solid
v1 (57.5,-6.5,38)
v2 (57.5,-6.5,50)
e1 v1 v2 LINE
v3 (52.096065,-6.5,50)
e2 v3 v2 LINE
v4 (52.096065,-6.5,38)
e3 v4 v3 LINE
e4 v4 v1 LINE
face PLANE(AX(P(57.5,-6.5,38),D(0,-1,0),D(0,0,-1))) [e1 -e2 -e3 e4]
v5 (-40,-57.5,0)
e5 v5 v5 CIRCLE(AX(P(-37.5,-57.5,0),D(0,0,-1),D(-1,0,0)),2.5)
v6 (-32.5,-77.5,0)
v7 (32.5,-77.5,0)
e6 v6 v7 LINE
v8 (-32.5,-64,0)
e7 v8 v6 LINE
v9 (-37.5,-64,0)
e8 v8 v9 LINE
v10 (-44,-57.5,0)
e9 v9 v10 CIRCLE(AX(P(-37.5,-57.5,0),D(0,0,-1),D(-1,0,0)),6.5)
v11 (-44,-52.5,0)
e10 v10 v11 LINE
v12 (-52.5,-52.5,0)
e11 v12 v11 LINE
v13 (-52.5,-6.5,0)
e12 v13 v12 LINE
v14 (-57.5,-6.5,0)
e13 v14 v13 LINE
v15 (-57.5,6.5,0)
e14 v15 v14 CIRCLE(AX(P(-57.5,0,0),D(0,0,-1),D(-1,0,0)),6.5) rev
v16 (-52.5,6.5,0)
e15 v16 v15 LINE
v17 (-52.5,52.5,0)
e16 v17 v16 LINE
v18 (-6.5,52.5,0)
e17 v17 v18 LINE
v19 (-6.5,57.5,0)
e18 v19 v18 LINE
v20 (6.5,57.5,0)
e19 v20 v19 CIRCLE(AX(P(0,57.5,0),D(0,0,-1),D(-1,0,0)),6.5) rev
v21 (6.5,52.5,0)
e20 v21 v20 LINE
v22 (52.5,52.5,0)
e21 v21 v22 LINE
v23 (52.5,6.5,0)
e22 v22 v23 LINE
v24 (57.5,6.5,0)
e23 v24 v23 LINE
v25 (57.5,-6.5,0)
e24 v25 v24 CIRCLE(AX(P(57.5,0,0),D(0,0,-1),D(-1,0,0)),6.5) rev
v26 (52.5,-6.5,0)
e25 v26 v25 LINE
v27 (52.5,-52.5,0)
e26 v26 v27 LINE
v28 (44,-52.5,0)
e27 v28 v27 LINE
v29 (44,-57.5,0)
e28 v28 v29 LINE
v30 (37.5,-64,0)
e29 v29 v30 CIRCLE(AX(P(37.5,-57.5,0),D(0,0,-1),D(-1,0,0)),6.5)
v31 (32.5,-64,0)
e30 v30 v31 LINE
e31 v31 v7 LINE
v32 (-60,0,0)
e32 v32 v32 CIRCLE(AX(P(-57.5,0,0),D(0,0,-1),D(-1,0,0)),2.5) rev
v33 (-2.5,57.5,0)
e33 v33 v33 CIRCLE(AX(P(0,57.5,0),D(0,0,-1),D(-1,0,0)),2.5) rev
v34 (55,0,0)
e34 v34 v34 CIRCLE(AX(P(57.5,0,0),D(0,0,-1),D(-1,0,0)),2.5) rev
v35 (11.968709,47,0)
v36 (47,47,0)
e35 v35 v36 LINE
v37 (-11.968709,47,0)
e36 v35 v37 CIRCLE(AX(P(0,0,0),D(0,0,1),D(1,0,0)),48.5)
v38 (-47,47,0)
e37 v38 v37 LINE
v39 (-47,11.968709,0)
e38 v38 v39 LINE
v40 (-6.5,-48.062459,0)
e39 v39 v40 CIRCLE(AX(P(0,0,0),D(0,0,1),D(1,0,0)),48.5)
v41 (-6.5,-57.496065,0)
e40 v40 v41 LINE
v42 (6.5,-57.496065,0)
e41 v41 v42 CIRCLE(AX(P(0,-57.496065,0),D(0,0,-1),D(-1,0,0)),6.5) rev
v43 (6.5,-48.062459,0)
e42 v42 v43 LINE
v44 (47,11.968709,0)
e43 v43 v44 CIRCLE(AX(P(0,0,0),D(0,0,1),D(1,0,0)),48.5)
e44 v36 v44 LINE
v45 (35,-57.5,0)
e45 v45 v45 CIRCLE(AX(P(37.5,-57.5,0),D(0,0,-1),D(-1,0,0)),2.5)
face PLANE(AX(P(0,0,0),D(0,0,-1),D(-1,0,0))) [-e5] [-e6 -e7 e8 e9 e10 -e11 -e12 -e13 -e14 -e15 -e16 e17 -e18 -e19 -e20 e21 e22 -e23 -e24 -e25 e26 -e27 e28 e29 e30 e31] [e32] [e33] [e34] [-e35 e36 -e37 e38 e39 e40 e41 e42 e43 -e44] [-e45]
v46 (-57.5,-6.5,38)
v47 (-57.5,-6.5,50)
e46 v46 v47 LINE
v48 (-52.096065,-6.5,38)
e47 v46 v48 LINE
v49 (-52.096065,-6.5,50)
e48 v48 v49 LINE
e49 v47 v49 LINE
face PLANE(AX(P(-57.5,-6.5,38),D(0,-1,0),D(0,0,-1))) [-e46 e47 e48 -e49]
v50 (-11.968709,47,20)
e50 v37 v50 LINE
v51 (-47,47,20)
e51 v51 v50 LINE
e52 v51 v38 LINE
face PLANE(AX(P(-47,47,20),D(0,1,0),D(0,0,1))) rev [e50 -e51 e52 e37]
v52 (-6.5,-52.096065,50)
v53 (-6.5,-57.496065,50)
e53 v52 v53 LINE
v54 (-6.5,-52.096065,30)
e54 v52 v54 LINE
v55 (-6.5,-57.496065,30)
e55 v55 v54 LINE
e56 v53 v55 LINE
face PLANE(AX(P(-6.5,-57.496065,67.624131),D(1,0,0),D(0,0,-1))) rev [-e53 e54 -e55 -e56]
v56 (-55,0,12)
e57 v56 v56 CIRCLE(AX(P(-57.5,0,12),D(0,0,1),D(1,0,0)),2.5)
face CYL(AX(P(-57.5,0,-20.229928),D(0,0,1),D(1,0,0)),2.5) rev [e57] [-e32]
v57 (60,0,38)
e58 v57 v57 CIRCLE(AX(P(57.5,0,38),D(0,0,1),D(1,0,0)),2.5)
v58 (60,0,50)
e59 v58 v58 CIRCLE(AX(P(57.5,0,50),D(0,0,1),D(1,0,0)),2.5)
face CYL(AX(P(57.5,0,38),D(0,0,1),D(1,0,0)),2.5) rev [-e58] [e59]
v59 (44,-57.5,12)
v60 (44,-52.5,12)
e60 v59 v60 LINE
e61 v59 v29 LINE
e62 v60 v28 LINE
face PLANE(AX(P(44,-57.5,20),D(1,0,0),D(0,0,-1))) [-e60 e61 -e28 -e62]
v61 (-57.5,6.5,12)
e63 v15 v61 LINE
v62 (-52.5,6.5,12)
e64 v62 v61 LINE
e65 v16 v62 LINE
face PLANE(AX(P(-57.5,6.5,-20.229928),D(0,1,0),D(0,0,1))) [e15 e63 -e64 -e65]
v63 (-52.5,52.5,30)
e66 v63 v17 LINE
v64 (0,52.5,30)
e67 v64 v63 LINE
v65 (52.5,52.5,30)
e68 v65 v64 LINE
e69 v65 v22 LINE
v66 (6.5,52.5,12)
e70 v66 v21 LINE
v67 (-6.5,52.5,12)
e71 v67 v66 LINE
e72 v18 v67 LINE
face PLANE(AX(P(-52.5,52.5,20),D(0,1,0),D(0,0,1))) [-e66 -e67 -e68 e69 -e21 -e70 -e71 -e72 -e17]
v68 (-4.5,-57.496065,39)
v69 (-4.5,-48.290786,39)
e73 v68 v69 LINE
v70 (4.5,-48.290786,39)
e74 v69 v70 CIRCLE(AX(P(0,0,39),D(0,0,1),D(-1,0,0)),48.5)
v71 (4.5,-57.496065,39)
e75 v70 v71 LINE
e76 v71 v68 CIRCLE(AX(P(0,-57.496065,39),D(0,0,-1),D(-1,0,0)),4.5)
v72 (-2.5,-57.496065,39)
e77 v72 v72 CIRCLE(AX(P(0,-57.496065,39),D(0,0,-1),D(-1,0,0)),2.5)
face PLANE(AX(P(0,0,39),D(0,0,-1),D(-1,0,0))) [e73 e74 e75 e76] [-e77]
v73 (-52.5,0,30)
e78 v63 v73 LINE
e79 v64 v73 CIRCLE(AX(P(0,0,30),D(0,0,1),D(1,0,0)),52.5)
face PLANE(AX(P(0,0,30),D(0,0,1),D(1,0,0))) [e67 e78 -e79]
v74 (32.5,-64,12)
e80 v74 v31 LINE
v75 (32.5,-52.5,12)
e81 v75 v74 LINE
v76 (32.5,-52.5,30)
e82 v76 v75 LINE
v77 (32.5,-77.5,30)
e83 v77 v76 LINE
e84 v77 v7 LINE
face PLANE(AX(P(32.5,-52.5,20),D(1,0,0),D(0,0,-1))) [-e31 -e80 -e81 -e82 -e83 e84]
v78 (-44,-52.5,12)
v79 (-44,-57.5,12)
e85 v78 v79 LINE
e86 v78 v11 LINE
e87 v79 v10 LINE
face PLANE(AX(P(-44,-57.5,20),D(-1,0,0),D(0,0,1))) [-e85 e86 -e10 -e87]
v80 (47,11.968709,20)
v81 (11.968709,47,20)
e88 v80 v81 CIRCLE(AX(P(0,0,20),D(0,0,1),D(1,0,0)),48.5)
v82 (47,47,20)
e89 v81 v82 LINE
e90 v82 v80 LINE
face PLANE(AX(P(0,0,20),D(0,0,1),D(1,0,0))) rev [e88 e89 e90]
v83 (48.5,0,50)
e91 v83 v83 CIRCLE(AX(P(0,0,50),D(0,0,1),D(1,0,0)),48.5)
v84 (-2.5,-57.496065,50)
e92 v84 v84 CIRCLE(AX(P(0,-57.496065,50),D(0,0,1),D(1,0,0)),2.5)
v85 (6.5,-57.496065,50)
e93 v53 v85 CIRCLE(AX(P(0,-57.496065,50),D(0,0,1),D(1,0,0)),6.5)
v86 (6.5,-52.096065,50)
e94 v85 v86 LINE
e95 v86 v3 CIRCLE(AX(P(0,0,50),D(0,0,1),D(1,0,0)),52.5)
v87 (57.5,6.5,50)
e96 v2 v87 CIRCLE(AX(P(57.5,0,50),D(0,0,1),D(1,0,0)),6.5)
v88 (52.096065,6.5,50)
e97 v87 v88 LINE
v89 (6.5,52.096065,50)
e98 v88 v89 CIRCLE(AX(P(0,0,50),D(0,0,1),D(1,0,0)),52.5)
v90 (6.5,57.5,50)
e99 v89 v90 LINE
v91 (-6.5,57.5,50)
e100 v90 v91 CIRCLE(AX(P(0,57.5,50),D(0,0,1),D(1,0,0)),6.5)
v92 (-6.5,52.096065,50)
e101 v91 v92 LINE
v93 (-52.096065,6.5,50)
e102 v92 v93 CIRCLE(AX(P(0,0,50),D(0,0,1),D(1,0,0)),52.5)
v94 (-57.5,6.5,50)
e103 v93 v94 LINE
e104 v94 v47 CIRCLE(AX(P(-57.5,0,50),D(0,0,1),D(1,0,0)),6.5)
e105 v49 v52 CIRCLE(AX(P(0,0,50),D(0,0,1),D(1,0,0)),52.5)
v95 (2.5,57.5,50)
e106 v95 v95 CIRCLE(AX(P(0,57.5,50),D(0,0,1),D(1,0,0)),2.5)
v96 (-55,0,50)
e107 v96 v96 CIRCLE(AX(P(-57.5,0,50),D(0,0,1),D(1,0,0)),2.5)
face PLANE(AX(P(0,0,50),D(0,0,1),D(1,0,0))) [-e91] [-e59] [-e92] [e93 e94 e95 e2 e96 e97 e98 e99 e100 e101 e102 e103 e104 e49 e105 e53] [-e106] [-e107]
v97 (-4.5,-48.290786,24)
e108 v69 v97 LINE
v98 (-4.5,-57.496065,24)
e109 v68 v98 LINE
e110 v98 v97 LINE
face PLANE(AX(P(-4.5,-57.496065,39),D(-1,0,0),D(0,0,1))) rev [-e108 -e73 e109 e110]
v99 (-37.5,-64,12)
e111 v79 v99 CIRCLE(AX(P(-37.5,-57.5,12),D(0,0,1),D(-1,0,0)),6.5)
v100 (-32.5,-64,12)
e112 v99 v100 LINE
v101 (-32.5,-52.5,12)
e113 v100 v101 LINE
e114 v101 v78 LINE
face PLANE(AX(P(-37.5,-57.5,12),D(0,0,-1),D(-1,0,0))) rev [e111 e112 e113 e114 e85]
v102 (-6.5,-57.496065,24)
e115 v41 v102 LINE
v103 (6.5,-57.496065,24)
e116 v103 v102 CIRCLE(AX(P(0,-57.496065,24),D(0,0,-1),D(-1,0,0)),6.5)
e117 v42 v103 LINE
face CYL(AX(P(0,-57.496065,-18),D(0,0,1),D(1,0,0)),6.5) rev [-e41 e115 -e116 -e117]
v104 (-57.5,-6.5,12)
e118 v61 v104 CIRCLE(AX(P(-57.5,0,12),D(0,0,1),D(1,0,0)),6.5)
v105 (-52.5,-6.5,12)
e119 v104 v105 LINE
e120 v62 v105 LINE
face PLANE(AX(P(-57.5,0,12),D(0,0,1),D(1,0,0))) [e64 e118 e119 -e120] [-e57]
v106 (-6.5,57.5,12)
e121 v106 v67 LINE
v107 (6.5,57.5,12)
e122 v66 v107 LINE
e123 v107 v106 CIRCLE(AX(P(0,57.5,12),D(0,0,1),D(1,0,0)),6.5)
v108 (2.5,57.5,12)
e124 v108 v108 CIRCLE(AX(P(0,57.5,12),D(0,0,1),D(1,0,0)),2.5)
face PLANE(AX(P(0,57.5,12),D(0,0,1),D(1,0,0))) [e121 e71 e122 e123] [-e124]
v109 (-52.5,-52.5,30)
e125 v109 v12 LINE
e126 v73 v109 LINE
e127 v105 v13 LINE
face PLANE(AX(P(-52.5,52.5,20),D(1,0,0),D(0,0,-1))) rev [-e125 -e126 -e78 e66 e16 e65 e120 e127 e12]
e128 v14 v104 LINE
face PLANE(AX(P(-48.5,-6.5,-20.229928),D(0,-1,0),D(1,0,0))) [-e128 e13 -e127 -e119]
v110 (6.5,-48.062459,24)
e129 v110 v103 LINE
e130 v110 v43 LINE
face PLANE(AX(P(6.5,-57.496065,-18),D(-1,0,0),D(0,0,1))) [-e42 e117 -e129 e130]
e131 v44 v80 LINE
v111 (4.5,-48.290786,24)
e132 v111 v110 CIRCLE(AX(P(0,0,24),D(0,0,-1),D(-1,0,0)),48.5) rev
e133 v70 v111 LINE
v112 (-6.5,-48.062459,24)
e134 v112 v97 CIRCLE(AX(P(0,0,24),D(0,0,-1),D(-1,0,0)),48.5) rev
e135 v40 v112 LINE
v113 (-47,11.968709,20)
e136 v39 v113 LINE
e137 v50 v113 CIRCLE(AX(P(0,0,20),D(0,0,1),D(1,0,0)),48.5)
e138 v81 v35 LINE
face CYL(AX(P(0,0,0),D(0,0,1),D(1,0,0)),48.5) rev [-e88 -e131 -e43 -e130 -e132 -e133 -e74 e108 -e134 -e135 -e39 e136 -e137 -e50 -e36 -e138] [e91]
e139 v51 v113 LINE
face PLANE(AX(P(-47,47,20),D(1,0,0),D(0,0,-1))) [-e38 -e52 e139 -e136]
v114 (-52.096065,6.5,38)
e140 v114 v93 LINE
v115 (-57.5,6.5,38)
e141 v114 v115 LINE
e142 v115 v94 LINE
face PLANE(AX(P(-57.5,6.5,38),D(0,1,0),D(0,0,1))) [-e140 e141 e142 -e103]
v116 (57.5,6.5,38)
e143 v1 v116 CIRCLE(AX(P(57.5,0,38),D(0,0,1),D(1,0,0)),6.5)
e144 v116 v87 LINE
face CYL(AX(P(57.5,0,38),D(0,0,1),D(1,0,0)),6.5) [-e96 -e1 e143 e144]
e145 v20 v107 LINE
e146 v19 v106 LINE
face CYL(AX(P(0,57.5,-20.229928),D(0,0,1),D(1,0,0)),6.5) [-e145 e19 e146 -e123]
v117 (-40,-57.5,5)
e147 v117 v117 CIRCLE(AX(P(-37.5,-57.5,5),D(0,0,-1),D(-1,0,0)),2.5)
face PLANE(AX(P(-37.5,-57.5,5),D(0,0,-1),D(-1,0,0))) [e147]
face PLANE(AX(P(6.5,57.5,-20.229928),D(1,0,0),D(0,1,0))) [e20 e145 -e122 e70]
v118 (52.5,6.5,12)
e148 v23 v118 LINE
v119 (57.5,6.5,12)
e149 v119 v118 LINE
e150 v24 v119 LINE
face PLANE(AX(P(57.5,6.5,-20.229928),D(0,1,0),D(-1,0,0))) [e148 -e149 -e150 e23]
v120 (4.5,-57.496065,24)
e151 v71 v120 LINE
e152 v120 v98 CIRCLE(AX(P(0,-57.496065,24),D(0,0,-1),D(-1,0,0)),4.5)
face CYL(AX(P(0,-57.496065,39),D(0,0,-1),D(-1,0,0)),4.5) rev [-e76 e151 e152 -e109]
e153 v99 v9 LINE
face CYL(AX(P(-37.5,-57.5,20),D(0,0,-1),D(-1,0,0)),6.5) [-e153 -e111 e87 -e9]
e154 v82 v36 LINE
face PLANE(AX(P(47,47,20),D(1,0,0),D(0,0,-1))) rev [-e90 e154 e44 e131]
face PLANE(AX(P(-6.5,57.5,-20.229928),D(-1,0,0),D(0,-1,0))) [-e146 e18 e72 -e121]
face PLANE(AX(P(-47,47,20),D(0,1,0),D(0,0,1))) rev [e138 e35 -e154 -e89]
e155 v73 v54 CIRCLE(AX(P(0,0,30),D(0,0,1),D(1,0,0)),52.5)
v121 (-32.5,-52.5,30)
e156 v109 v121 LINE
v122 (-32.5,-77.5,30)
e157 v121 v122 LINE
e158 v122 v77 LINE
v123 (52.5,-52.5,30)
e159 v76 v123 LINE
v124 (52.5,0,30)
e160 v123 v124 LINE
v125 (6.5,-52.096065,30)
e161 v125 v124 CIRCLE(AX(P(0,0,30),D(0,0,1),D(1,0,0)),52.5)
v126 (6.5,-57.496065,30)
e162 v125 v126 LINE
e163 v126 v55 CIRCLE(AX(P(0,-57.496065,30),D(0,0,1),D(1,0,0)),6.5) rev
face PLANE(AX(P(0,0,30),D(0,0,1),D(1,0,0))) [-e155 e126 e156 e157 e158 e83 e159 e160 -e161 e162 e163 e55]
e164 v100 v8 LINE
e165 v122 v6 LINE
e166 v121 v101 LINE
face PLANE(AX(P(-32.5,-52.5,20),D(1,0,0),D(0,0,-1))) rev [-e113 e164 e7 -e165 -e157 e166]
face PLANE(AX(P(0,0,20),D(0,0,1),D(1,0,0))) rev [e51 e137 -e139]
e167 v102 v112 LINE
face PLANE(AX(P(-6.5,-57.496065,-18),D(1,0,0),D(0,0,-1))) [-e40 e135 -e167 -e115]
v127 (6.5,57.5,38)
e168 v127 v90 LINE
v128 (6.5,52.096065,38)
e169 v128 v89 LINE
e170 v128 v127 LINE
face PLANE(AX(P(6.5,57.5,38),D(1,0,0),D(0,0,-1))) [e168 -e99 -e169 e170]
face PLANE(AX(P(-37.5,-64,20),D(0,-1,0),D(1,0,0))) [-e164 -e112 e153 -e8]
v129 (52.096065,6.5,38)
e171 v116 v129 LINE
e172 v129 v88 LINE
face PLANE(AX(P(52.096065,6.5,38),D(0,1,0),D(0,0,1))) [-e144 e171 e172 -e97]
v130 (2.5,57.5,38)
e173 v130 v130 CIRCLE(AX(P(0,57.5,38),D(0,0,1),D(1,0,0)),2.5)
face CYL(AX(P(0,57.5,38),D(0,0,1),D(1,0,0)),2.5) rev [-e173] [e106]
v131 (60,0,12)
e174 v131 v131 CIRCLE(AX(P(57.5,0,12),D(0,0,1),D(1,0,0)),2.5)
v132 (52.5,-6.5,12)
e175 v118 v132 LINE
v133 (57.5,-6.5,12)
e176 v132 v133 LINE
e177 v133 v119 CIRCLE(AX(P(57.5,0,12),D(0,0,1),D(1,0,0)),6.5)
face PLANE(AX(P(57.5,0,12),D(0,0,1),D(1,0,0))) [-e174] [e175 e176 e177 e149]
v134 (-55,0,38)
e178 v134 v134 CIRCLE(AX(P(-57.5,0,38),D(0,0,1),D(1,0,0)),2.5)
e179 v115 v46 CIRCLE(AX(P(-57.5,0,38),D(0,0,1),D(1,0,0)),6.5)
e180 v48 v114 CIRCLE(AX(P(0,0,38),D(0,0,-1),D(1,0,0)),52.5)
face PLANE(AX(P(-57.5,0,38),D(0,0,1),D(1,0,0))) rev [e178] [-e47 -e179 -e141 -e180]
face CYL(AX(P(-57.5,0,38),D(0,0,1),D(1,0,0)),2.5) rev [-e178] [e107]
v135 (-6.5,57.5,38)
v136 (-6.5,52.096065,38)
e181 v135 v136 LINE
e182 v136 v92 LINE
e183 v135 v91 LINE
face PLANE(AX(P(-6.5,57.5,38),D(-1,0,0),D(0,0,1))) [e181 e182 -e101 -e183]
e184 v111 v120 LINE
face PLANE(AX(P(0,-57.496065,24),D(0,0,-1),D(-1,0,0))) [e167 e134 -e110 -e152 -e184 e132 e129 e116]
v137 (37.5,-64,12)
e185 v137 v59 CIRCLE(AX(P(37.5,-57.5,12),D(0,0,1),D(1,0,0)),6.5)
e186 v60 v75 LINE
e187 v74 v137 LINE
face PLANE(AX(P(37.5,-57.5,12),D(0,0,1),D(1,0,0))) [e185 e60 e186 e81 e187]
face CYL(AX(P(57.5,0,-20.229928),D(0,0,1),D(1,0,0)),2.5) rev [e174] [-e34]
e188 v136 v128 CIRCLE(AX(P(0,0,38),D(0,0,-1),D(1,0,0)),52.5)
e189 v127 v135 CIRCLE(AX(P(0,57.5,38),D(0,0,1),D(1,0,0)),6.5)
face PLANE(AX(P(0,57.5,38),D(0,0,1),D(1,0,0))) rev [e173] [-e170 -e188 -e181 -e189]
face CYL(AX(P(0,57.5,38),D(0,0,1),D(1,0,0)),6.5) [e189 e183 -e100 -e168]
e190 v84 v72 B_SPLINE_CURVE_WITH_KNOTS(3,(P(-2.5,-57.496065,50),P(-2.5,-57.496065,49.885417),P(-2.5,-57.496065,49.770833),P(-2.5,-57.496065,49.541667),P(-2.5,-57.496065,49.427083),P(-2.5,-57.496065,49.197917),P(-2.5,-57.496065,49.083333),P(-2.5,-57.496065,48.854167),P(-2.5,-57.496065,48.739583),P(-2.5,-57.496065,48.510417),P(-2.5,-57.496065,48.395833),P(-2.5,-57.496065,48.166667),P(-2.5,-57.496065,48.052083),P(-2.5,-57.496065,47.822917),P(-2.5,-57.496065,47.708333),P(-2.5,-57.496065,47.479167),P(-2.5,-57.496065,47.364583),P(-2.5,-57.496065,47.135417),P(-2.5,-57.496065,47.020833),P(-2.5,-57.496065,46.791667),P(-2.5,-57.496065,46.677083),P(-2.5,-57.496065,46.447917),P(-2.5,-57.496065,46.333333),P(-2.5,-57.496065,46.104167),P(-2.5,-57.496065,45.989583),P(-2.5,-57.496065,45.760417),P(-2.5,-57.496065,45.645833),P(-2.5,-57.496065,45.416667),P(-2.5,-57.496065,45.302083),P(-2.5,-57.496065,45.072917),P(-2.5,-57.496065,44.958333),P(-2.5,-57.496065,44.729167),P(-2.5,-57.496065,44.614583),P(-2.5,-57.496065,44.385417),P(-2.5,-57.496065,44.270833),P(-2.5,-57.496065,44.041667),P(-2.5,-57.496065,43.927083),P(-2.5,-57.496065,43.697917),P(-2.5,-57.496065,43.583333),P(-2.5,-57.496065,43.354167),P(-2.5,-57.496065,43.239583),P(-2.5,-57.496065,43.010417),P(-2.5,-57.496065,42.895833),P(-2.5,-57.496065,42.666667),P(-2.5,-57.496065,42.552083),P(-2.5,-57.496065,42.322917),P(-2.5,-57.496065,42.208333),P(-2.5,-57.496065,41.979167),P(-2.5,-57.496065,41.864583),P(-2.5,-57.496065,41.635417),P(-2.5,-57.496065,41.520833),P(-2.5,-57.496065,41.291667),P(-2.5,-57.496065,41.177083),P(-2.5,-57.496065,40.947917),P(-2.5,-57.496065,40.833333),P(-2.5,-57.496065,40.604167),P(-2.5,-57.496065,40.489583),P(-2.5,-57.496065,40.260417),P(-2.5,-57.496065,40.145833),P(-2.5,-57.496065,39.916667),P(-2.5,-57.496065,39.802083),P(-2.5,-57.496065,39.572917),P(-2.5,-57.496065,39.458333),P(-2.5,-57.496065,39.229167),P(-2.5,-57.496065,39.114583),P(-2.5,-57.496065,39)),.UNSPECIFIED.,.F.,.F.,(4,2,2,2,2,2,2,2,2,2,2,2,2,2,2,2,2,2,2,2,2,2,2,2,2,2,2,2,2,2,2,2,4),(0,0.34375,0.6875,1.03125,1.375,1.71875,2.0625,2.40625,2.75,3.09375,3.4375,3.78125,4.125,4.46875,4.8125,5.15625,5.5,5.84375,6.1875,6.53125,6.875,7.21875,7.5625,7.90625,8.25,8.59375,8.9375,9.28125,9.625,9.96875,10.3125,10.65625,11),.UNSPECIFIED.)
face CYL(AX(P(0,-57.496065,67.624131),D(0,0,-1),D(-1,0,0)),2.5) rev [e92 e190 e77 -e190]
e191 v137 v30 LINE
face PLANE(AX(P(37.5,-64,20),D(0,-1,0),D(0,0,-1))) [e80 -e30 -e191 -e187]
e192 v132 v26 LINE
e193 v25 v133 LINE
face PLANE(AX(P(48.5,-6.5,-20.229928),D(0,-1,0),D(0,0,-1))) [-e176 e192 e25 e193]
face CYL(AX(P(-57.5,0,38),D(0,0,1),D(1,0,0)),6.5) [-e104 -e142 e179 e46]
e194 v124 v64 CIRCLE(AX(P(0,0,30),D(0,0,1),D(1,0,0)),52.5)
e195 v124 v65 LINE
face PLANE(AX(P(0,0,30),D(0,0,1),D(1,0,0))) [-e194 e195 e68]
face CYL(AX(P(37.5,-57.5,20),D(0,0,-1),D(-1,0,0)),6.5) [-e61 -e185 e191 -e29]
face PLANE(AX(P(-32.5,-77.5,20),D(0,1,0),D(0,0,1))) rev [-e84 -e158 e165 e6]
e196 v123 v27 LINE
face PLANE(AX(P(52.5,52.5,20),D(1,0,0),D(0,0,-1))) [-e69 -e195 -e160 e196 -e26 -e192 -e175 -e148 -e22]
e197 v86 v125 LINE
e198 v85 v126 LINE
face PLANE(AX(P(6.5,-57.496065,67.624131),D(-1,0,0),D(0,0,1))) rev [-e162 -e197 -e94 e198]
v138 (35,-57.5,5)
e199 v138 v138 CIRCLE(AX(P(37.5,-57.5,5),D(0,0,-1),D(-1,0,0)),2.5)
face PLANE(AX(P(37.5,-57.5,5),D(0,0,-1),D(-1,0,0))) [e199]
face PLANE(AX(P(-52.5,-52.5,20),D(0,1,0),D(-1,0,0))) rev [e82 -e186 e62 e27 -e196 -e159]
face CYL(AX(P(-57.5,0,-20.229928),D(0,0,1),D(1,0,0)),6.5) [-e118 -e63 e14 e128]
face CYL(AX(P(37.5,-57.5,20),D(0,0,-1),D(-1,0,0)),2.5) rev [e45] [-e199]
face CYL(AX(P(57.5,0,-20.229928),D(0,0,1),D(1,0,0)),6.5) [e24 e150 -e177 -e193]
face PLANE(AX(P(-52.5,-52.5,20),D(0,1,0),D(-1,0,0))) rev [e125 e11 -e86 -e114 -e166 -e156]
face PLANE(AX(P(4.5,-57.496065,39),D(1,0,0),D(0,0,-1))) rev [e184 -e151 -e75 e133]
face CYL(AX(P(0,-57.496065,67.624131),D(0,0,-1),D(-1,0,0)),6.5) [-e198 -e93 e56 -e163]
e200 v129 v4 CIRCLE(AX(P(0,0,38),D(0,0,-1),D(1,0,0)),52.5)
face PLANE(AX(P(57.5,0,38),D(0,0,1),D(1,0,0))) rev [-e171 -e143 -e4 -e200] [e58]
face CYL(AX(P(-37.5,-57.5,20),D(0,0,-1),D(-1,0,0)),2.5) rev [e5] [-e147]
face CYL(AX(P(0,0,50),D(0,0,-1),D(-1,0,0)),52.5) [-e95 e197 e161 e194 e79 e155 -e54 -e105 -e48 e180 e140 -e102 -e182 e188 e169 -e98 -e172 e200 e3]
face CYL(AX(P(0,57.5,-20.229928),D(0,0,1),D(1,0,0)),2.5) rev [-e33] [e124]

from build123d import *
from build123d.topology import SkipClean

# Parameters (mm, degrees)
SKETCH1_W                = 105
SKETCH1_H                = 105
SKETCH1_W_2              = 94
SKETCH1_H_2              = 94
SKETCH1_W_3              = 65
SKETCH1_H_3              = 25
BOSS_EXTRUDE1_DEPTH      = 20
SKETCH2_W                = 65
SKETCH2_H                = 25
SKETCH2_W_2              = 94
SKETCH2_H_2              = 94
BOSS_EXTRUDE2_DEPTH      = 10
SKETCH3_W                = 57
SKETCH3_H                = 26.5
CUT_EXTRUDE1_DEPTH       = 20
SKETCH5_R                = 52.5
BOSS_EXTRUDE4_DEPTH      = 20
SKETCH8_R                = 48.5
CUT_EXTRUDE3_DEPTH       = 107.124926384
BOSS_EXTRUDE5_START      = -38
SKETCH9_R                = 2.5
BOSS_EXTRUDE5_DEPTH      = 12
SKETCH4_R                = 2.5
BOSS_EXTRUDE6_DEPTH      = 20
SKETCH10_W               = 15.5
SKETCH10_H               = 26.597794237
CUT_EXTRUDE4_DEPTH       = 20
BOSS_EXTRUDE8_START      = -45
SKETCH11_R               = 2.5
BOSS_EXTRUDE8_DEPTH      = 15
BOSS_EXTRUDE7_DEPTH      = 20
SKETCH16_R               = 2.5
BOSS_EXTRUDE9_DEPTH      = 30
CUT_EXTRUDE5_START       = -8
CUT_EXTRUDE5_DEPTH       = 8
SKETCH18_R               = 2.5
BOSS_EXTRUDE10_DEPTH     = 12
CUT_EXTRUDE12_DEPTH      = 18
CUT_EXTRUDE12_DEPTH_BACK = 24
CUT_EXTRUDE13_DEPTH      = 15


# Read off the part's stored shape, not the designer's step: Boss-Extrude7
with BuildPart() as part:
    # Sketch1 → Boss-Extrude1 (new body)
    # profile 1 of 2: a face of its own
    with BuildSketch(Plane.XY):
        Rectangle(SKETCH1_W, SKETCH1_H)
        Rectangle(SKETCH1_W_2, SKETCH1_H_2, mode=Mode.SUBTRACT)
    # profile 2 of 2: a face of its own
    with BuildSketch(Plane.XY):
        with Locations((0, -65)):
            Rectangle(SKETCH1_W_3, SKETCH1_H_3)
    extrude(amount=BOSS_EXTRUDE1_DEPTH)

    # Sketch2 → Boss-Extrude2 (add)
    # profile 1 of 3: a face of its own
    with BuildSketch(Plane.XY.offset(20)):
        with Locations((0, -65)):
            Rectangle(SKETCH2_W, SKETCH2_H)
    # profile 2 of 3: a face of its own
    with BuildSketch(Plane.XY.offset(20)):
        Polygon((52.5, 52.5), (-52.5, 52.5), (-52.5, -52.5), (-32.5, -52.5), (32.5, -52.5), (52.5, -52.5), align=None)
        Rectangle(SKETCH2_W_2, SKETCH2_H_2, mode=Mode.SUBTRACT)
    # profile 3 of 3: a face of its own
    with BuildSketch(Plane.XY.offset(20)):
        Rectangle(SKETCH2_W_2, SKETCH2_H_2)
    extrude(amount=BOSS_EXTRUDE2_DEPTH)

    # Sketch3 → Cut-Extrude1 (cut)
    with BuildSketch(Plane(origin=(0, 0, 0), x_dir=(-1, 0, 0), z_dir=(0, 0, -1))):
        with Locations((0, -60.25)):
            Rectangle(SKETCH3_W, SKETCH3_H)
    extrude(amount=-CUT_EXTRUDE1_DEPTH, mode=Mode.SUBTRACT)

    # Sketch5 → Boss-Extrude4 (add)
    with BuildSketch(Plane.XY.offset(30)):
        Circle(SKETCH5_R)
    extrude(amount=BOSS_EXTRUDE4_DEPTH)

    # Sketch8 → Cut-Extrude3 (cut, through all)
    with BuildSketch(Plane.XY.offset(50)):
        Circle(SKETCH8_R)
    extrude(amount=-CUT_EXTRUDE3_DEPTH, mode=Mode.SUBTRACT)

    # Sketch9 → Boss-Extrude5 (add)
    # profile 1 of 3: a face of its own
    with BuildSketch(Plane.XY.offset(50).offset(BOSS_EXTRUDE5_START)):
        with BuildLine():
            Line((57.5, 6.5), (48.5, 6.5))
            Line((48.5, 6.5), (48.5, -6.5))
            Line((48.5, -6.5), (57.5, -6.5))
            ThreePointArc((57.5, -6.5), (64, 0), (57.5, 6.5))
        make_face()
        with Locations((57.5, 0)):
            Circle(SKETCH9_R, mode=Mode.SUBTRACT)
    # profile 2 of 3: a face of its own
    with BuildSketch(Plane.XY.offset(50).offset(BOSS_EXTRUDE5_START)):
        with BuildLine():
            Line((-57.5, 6.5), (-48.5, 6.5))
            Line((-48.5, 6.5), (-48.5, -6.5))
            Line((-48.5, -6.5), (-57.5, -6.5))
            ThreePointArc((-57.5, -6.5), (-64, 0), (-57.5, 6.5))
        make_face()
        with Locations((-57.5, 0)):
            Circle(SKETCH9_R, mode=Mode.SUBTRACT)
    # profile 3 of 3: a face of its own
    with BuildSketch(Plane.XY.offset(50).offset(BOSS_EXTRUDE5_START)):
        with BuildLine():
            Line((-6.5, 57.5), (-6.5, 48.5))
            Line((-6.5, 48.5), (6.5, 48.5))
            Line((6.5, 48.5), (6.5, 57.5))
            ThreePointArc((6.5, 57.5), (0, 64), (-6.5, 57.5))
        make_face()
        with Locations((0, 57.5)):
            Circle(SKETCH9_R, mode=Mode.SUBTRACT)
    extrude(amount=-BOSS_EXTRUDE5_DEPTH)

    # Sketch4 → Boss-Extrude6 (add)
    with BuildSketch(Plane(origin=(0, 0, 0), x_dir=(-1, 0, 0), z_dir=(0, 0, -1))):
        with BuildLine():
            Line((-32.5, -64), (-32.5, -77.5))
            Line((-32.5, -77.5), (32.5, -77.5))
            Line((32.5, -77.5), (32.5, -64))
            Line((32.5, -64), (37.5, -64))
            ThreePointArc((37.5, -64), (42.096194078, -62.096194078), (44, -57.5))
            Line((44, -57.5), (44, -52.5))
            Line((44, -52.5), (52.5, -52.5))
            Line((52.5, -52.5), (52.021296507, -7.073521736))
            ThreePointArc((52.021296507, -7.073521736), (49.206713639, -18.301621043), (44, -28.640006983))
            Line((44, -28.640006983), (44, -20.402205763))
            ThreePointArc((44, -20.402205763), (0, -48.5), (-44, -20.402205763))
            Line((-44, -20.402205763), (-44, -28.640006983))
            ThreePointArc((-44, -28.640006983), (-50.330159944, -14.937369246), (-52.5, 0))
            Line((-52.5, 0), (-52.5, -52.5))
            Line((-52.5, -52.5), (-44, -52.5))
            Line((-44, -52.5), (-44, -57.5))
            ThreePointArc((-44, -57.5), (-42.096194078, -62.096194078), (-37.5, -64))
            Line((-37.5, -64), (-32.5, -64))
        make_face()
        with Locations((-37.5, -57.5)):
            Circle(SKETCH4_R, mode=Mode.SUBTRACT)
        with Locations((37.5, -57.5)):
            Circle(SKETCH4_R, mode=Mode.SUBTRACT)
    extrude(amount=-BOSS_EXTRUDE6_DEPTH)

    # Sketch10 → Cut-Extrude4 (cut)
    with BuildSketch(Plane(origin=(0, 0, 0), x_dir=(-1, 0, 0), z_dir=(0, 0, -1))):
        with Locations((-36.25, -33.701102881)):
            Rectangle(SKETCH10_W, SKETCH10_H)
        with Locations((37.754368076, -33.701102881)):
            Rectangle(SKETCH10_W, SKETCH10_H)
    extrude(amount=-CUT_EXTRUDE4_DEPTH, mode=Mode.SUBTRACT)

    # Sketch11 → Boss-Extrude8 (add)
    with BuildSketch(Plane.XY.offset(50).offset(BOSS_EXTRUDE8_START)):
        with Locations(Location((-37.5, -57.5, 0), (0, 0, 180))):
            Circle(SKETCH11_R)
        with Locations(Location((37.5, -57.5, 0), (0, 0, 180))):
            Circle(SKETCH11_R)
    extrude(amount=BOSS_EXTRUDE8_DEPTH)

    # Boss-Extrude7 outline → Boss-Extrude7 (add)
    with SkipClean():  # the faces are left unmerged after this step: merging them gives an invalid solid
        with BuildSketch(Plane.XY):
            with BuildLine():
                ThreePointArc((-30.004368076, -38.104958947), (-40.659489217, -26.439665971), (-47, -11.968709204))
                Line((-47, -11.968709204), (-47, -23.393375131))
                ThreePointArc((-47, -23.393375131), (-46.273225972, -24.79997093), (-45.504368076, -26.18401203))
                Line((-45.504368076, -26.18401203), (-45.504368076, -47))
                Line((-45.504368076, -47), (-30.004368076, -47))
                Line((-30.004368076, -47), (-30.004368076, -38.104958947))
            make_face()
            with BuildLine():
                Line((47, -23.393375131), (47, -11.968709204))
                ThreePointArc((47, -11.968709204), (40.137662704, -27.225319699), (28.5, -39.242833741))
                Line((28.5, -39.242833741), (28.5, -47))
                Line((28.5, -47), (44, -47))
                Line((44, -47), (44, -28.640006983))
                ThreePointArc((44, -28.640006983), (45.575561285, -26.059896653), (47, -23.393375131))
            make_face()
        extrude(amount=BOSS_EXTRUDE7_DEPTH)

    # Sketch16 → Boss-Extrude9 (add)
    with SkipClean():  # the faces are left unmerged after this step: merging them gives an invalid solid
        with BuildSketch(Plane.XY.offset(20)):
            with BuildLine():
                Line((-6.5, -57.496065111), (-6.5, -52.096065111))
                ThreePointArc((-6.5, -52.096065111), (0, -52.5), (6.5, -52.096065111))
                Line((6.5, -52.096065111), (6.5, -57.496065111))
                ThreePointArc((6.5, -57.496065111), (0, -63.996065111), (-6.5, -57.496065111))
            make_face()
            with Locations(Location((0, -57.496065111, 0), (0, 0, 180))):
                Circle(SKETCH16_R, mode=Mode.SUBTRACT)
        extrude(amount=BOSS_EXTRUDE9_DEPTH)

    # Sketch17 → Cut-Extrude5 (cut)
    with SkipClean():  # the faces are left unmerged after this step: merging them gives an invalid solid
        with BuildSketch(Plane.XY.offset(20).offset(CUT_EXTRUDE5_START)):
            with BuildLine():
                Line((32.5, -64), (32.5, -52.5))
                Line((32.5, -52.5), (44, -52.5))
                Line((44, -52.5), (44, -57.5))
                ThreePointArc((44, -57.5), (42.096194078, -62.096194078), (37.5, -64))
                Line((37.5, -64), (32.5, -64))
            make_face()
            with BuildLine():
                Line((-44, -52.5), (-32.5, -52.5))
                Line((-32.5, -52.5), (-32.5, -64))
                Line((-32.5, -64), (-37.5, -64))
                ThreePointArc((-37.5, -64), (-42.096194078, -62.096194078), (-44, -57.5))
                Line((-44, -57.5), (-44, -52.5))
            make_face()
        extrude(amount=CUT_EXTRUDE5_DEPTH, mode=Mode.SUBTRACT)

    # Sketch18 → Boss-Extrude10 (add)
    # profile 1 of 3: a face of its own
    with SkipClean():  # the faces are left unmerged after this step: merging them gives an invalid solid
        with BuildSketch(Plane.XY.offset(50)):
            with BuildLine():
                Line((-57.5, 6.5), (-52.096065111, 6.5))
                ThreePointArc((-52.096065111, 6.5), (-52.5, 0), (-52.096065111, -6.5))
                Line((-52.096065111, -6.5), (-57.5, -6.5))
                ThreePointArc((-57.5, -6.5), (-64, 0), (-57.5, 6.5))
            make_face()
            with Locations((-57.5, 0)):
                Circle(SKETCH18_R, mode=Mode.SUBTRACT)
        # profile 2 of 3: a face of its own
        with BuildSketch(Plane.XY.offset(50)):
            with BuildLine():
                Line((52.096065111, 6.5), (57.5, 6.5))
                ThreePointArc((57.5, 6.5), (64, 0), (57.5, -6.5))
                Line((57.5, -6.5), (52.096065111, -6.5))
                ThreePointArc((52.096065111, -6.5), (52.5, 0), (52.096065111, 6.5))
            make_face()
            with Locations((57.5, 0)):
                Circle(SKETCH18_R, mode=Mode.SUBTRACT)
        # profile 3 of 3: a face of its own
        with BuildSketch(Plane.XY.offset(50)):
            with BuildLine():
                Line((-6.5, 57.5), (-6.5, 52.096065111))
                ThreePointArc((-6.5, 52.096065111), (0, 52.5), (6.5, 52.096065111))
                Line((6.5, 52.096065111), (6.5, 57.5))
                ThreePointArc((6.5, 57.5), (0, 64), (-6.5, 57.5))
            make_face()
            with Locations((0, 57.5)):
                Circle(SKETCH18_R, mode=Mode.SUBTRACT)
        extrude(amount=-BOSS_EXTRUDE10_DEPTH)

    # Sketch19 → Cut-Extrude12 (cut, two sides: drawn at the far end of the back side and taken through both)
    with SkipClean():  # the faces are left unmerged after this step: merging them gives an invalid solid
        with BuildSketch(Plane(origin=(0, 0, 0), x_dir=(-1, 0, 0), z_dir=(0, 0, -1)).offset(-CUT_EXTRUDE12_DEPTH_BACK)):
            with BuildLine():
                Line((-6.5, -57.496065111), (-6.5, -46.382922992))
                ThreePointArc((-6.5, -46.382922992), (0, -46.836156389), (6.5, -46.382922992))
                Line((6.5, -46.382922992), (6.5, -57.496065111))
                ThreePointArc((6.5, -57.496065111), (0, -63.996065111), (-6.5, -57.496065111))
            make_face()
        extrude(amount=CUT_EXTRUDE12_DEPTH + CUT_EXTRUDE12_DEPTH_BACK, mode=Mode.SUBTRACT)

    # Sketch20 → Cut-Extrude13 (cut)
    with SkipClean():  # the faces are left unmerged after this step: merging them gives an invalid solid
        with BuildSketch(Plane(origin=(0, 0, 24), x_dir=(-1, 0, 0), z_dir=(0, 0, -1))):
            with BuildLine():
                Line((4.5, -57.496065111), (4.5, -48.290785871))
                ThreePointArc((4.5, -48.290785871), (0, -48.5), (-4.5, -48.290785871))
                Line((-4.5, -48.290785871), (-4.5, -57.496065111))
                ThreePointArc((-4.5, -57.496065111), (0, -61.996065111), (4.5, -57.496065111))
            make_face()
        extrude(amount=-CUT_EXTRUDE13_DEPTH, mode=Mode.SUBTRACT)


solid = part.part
